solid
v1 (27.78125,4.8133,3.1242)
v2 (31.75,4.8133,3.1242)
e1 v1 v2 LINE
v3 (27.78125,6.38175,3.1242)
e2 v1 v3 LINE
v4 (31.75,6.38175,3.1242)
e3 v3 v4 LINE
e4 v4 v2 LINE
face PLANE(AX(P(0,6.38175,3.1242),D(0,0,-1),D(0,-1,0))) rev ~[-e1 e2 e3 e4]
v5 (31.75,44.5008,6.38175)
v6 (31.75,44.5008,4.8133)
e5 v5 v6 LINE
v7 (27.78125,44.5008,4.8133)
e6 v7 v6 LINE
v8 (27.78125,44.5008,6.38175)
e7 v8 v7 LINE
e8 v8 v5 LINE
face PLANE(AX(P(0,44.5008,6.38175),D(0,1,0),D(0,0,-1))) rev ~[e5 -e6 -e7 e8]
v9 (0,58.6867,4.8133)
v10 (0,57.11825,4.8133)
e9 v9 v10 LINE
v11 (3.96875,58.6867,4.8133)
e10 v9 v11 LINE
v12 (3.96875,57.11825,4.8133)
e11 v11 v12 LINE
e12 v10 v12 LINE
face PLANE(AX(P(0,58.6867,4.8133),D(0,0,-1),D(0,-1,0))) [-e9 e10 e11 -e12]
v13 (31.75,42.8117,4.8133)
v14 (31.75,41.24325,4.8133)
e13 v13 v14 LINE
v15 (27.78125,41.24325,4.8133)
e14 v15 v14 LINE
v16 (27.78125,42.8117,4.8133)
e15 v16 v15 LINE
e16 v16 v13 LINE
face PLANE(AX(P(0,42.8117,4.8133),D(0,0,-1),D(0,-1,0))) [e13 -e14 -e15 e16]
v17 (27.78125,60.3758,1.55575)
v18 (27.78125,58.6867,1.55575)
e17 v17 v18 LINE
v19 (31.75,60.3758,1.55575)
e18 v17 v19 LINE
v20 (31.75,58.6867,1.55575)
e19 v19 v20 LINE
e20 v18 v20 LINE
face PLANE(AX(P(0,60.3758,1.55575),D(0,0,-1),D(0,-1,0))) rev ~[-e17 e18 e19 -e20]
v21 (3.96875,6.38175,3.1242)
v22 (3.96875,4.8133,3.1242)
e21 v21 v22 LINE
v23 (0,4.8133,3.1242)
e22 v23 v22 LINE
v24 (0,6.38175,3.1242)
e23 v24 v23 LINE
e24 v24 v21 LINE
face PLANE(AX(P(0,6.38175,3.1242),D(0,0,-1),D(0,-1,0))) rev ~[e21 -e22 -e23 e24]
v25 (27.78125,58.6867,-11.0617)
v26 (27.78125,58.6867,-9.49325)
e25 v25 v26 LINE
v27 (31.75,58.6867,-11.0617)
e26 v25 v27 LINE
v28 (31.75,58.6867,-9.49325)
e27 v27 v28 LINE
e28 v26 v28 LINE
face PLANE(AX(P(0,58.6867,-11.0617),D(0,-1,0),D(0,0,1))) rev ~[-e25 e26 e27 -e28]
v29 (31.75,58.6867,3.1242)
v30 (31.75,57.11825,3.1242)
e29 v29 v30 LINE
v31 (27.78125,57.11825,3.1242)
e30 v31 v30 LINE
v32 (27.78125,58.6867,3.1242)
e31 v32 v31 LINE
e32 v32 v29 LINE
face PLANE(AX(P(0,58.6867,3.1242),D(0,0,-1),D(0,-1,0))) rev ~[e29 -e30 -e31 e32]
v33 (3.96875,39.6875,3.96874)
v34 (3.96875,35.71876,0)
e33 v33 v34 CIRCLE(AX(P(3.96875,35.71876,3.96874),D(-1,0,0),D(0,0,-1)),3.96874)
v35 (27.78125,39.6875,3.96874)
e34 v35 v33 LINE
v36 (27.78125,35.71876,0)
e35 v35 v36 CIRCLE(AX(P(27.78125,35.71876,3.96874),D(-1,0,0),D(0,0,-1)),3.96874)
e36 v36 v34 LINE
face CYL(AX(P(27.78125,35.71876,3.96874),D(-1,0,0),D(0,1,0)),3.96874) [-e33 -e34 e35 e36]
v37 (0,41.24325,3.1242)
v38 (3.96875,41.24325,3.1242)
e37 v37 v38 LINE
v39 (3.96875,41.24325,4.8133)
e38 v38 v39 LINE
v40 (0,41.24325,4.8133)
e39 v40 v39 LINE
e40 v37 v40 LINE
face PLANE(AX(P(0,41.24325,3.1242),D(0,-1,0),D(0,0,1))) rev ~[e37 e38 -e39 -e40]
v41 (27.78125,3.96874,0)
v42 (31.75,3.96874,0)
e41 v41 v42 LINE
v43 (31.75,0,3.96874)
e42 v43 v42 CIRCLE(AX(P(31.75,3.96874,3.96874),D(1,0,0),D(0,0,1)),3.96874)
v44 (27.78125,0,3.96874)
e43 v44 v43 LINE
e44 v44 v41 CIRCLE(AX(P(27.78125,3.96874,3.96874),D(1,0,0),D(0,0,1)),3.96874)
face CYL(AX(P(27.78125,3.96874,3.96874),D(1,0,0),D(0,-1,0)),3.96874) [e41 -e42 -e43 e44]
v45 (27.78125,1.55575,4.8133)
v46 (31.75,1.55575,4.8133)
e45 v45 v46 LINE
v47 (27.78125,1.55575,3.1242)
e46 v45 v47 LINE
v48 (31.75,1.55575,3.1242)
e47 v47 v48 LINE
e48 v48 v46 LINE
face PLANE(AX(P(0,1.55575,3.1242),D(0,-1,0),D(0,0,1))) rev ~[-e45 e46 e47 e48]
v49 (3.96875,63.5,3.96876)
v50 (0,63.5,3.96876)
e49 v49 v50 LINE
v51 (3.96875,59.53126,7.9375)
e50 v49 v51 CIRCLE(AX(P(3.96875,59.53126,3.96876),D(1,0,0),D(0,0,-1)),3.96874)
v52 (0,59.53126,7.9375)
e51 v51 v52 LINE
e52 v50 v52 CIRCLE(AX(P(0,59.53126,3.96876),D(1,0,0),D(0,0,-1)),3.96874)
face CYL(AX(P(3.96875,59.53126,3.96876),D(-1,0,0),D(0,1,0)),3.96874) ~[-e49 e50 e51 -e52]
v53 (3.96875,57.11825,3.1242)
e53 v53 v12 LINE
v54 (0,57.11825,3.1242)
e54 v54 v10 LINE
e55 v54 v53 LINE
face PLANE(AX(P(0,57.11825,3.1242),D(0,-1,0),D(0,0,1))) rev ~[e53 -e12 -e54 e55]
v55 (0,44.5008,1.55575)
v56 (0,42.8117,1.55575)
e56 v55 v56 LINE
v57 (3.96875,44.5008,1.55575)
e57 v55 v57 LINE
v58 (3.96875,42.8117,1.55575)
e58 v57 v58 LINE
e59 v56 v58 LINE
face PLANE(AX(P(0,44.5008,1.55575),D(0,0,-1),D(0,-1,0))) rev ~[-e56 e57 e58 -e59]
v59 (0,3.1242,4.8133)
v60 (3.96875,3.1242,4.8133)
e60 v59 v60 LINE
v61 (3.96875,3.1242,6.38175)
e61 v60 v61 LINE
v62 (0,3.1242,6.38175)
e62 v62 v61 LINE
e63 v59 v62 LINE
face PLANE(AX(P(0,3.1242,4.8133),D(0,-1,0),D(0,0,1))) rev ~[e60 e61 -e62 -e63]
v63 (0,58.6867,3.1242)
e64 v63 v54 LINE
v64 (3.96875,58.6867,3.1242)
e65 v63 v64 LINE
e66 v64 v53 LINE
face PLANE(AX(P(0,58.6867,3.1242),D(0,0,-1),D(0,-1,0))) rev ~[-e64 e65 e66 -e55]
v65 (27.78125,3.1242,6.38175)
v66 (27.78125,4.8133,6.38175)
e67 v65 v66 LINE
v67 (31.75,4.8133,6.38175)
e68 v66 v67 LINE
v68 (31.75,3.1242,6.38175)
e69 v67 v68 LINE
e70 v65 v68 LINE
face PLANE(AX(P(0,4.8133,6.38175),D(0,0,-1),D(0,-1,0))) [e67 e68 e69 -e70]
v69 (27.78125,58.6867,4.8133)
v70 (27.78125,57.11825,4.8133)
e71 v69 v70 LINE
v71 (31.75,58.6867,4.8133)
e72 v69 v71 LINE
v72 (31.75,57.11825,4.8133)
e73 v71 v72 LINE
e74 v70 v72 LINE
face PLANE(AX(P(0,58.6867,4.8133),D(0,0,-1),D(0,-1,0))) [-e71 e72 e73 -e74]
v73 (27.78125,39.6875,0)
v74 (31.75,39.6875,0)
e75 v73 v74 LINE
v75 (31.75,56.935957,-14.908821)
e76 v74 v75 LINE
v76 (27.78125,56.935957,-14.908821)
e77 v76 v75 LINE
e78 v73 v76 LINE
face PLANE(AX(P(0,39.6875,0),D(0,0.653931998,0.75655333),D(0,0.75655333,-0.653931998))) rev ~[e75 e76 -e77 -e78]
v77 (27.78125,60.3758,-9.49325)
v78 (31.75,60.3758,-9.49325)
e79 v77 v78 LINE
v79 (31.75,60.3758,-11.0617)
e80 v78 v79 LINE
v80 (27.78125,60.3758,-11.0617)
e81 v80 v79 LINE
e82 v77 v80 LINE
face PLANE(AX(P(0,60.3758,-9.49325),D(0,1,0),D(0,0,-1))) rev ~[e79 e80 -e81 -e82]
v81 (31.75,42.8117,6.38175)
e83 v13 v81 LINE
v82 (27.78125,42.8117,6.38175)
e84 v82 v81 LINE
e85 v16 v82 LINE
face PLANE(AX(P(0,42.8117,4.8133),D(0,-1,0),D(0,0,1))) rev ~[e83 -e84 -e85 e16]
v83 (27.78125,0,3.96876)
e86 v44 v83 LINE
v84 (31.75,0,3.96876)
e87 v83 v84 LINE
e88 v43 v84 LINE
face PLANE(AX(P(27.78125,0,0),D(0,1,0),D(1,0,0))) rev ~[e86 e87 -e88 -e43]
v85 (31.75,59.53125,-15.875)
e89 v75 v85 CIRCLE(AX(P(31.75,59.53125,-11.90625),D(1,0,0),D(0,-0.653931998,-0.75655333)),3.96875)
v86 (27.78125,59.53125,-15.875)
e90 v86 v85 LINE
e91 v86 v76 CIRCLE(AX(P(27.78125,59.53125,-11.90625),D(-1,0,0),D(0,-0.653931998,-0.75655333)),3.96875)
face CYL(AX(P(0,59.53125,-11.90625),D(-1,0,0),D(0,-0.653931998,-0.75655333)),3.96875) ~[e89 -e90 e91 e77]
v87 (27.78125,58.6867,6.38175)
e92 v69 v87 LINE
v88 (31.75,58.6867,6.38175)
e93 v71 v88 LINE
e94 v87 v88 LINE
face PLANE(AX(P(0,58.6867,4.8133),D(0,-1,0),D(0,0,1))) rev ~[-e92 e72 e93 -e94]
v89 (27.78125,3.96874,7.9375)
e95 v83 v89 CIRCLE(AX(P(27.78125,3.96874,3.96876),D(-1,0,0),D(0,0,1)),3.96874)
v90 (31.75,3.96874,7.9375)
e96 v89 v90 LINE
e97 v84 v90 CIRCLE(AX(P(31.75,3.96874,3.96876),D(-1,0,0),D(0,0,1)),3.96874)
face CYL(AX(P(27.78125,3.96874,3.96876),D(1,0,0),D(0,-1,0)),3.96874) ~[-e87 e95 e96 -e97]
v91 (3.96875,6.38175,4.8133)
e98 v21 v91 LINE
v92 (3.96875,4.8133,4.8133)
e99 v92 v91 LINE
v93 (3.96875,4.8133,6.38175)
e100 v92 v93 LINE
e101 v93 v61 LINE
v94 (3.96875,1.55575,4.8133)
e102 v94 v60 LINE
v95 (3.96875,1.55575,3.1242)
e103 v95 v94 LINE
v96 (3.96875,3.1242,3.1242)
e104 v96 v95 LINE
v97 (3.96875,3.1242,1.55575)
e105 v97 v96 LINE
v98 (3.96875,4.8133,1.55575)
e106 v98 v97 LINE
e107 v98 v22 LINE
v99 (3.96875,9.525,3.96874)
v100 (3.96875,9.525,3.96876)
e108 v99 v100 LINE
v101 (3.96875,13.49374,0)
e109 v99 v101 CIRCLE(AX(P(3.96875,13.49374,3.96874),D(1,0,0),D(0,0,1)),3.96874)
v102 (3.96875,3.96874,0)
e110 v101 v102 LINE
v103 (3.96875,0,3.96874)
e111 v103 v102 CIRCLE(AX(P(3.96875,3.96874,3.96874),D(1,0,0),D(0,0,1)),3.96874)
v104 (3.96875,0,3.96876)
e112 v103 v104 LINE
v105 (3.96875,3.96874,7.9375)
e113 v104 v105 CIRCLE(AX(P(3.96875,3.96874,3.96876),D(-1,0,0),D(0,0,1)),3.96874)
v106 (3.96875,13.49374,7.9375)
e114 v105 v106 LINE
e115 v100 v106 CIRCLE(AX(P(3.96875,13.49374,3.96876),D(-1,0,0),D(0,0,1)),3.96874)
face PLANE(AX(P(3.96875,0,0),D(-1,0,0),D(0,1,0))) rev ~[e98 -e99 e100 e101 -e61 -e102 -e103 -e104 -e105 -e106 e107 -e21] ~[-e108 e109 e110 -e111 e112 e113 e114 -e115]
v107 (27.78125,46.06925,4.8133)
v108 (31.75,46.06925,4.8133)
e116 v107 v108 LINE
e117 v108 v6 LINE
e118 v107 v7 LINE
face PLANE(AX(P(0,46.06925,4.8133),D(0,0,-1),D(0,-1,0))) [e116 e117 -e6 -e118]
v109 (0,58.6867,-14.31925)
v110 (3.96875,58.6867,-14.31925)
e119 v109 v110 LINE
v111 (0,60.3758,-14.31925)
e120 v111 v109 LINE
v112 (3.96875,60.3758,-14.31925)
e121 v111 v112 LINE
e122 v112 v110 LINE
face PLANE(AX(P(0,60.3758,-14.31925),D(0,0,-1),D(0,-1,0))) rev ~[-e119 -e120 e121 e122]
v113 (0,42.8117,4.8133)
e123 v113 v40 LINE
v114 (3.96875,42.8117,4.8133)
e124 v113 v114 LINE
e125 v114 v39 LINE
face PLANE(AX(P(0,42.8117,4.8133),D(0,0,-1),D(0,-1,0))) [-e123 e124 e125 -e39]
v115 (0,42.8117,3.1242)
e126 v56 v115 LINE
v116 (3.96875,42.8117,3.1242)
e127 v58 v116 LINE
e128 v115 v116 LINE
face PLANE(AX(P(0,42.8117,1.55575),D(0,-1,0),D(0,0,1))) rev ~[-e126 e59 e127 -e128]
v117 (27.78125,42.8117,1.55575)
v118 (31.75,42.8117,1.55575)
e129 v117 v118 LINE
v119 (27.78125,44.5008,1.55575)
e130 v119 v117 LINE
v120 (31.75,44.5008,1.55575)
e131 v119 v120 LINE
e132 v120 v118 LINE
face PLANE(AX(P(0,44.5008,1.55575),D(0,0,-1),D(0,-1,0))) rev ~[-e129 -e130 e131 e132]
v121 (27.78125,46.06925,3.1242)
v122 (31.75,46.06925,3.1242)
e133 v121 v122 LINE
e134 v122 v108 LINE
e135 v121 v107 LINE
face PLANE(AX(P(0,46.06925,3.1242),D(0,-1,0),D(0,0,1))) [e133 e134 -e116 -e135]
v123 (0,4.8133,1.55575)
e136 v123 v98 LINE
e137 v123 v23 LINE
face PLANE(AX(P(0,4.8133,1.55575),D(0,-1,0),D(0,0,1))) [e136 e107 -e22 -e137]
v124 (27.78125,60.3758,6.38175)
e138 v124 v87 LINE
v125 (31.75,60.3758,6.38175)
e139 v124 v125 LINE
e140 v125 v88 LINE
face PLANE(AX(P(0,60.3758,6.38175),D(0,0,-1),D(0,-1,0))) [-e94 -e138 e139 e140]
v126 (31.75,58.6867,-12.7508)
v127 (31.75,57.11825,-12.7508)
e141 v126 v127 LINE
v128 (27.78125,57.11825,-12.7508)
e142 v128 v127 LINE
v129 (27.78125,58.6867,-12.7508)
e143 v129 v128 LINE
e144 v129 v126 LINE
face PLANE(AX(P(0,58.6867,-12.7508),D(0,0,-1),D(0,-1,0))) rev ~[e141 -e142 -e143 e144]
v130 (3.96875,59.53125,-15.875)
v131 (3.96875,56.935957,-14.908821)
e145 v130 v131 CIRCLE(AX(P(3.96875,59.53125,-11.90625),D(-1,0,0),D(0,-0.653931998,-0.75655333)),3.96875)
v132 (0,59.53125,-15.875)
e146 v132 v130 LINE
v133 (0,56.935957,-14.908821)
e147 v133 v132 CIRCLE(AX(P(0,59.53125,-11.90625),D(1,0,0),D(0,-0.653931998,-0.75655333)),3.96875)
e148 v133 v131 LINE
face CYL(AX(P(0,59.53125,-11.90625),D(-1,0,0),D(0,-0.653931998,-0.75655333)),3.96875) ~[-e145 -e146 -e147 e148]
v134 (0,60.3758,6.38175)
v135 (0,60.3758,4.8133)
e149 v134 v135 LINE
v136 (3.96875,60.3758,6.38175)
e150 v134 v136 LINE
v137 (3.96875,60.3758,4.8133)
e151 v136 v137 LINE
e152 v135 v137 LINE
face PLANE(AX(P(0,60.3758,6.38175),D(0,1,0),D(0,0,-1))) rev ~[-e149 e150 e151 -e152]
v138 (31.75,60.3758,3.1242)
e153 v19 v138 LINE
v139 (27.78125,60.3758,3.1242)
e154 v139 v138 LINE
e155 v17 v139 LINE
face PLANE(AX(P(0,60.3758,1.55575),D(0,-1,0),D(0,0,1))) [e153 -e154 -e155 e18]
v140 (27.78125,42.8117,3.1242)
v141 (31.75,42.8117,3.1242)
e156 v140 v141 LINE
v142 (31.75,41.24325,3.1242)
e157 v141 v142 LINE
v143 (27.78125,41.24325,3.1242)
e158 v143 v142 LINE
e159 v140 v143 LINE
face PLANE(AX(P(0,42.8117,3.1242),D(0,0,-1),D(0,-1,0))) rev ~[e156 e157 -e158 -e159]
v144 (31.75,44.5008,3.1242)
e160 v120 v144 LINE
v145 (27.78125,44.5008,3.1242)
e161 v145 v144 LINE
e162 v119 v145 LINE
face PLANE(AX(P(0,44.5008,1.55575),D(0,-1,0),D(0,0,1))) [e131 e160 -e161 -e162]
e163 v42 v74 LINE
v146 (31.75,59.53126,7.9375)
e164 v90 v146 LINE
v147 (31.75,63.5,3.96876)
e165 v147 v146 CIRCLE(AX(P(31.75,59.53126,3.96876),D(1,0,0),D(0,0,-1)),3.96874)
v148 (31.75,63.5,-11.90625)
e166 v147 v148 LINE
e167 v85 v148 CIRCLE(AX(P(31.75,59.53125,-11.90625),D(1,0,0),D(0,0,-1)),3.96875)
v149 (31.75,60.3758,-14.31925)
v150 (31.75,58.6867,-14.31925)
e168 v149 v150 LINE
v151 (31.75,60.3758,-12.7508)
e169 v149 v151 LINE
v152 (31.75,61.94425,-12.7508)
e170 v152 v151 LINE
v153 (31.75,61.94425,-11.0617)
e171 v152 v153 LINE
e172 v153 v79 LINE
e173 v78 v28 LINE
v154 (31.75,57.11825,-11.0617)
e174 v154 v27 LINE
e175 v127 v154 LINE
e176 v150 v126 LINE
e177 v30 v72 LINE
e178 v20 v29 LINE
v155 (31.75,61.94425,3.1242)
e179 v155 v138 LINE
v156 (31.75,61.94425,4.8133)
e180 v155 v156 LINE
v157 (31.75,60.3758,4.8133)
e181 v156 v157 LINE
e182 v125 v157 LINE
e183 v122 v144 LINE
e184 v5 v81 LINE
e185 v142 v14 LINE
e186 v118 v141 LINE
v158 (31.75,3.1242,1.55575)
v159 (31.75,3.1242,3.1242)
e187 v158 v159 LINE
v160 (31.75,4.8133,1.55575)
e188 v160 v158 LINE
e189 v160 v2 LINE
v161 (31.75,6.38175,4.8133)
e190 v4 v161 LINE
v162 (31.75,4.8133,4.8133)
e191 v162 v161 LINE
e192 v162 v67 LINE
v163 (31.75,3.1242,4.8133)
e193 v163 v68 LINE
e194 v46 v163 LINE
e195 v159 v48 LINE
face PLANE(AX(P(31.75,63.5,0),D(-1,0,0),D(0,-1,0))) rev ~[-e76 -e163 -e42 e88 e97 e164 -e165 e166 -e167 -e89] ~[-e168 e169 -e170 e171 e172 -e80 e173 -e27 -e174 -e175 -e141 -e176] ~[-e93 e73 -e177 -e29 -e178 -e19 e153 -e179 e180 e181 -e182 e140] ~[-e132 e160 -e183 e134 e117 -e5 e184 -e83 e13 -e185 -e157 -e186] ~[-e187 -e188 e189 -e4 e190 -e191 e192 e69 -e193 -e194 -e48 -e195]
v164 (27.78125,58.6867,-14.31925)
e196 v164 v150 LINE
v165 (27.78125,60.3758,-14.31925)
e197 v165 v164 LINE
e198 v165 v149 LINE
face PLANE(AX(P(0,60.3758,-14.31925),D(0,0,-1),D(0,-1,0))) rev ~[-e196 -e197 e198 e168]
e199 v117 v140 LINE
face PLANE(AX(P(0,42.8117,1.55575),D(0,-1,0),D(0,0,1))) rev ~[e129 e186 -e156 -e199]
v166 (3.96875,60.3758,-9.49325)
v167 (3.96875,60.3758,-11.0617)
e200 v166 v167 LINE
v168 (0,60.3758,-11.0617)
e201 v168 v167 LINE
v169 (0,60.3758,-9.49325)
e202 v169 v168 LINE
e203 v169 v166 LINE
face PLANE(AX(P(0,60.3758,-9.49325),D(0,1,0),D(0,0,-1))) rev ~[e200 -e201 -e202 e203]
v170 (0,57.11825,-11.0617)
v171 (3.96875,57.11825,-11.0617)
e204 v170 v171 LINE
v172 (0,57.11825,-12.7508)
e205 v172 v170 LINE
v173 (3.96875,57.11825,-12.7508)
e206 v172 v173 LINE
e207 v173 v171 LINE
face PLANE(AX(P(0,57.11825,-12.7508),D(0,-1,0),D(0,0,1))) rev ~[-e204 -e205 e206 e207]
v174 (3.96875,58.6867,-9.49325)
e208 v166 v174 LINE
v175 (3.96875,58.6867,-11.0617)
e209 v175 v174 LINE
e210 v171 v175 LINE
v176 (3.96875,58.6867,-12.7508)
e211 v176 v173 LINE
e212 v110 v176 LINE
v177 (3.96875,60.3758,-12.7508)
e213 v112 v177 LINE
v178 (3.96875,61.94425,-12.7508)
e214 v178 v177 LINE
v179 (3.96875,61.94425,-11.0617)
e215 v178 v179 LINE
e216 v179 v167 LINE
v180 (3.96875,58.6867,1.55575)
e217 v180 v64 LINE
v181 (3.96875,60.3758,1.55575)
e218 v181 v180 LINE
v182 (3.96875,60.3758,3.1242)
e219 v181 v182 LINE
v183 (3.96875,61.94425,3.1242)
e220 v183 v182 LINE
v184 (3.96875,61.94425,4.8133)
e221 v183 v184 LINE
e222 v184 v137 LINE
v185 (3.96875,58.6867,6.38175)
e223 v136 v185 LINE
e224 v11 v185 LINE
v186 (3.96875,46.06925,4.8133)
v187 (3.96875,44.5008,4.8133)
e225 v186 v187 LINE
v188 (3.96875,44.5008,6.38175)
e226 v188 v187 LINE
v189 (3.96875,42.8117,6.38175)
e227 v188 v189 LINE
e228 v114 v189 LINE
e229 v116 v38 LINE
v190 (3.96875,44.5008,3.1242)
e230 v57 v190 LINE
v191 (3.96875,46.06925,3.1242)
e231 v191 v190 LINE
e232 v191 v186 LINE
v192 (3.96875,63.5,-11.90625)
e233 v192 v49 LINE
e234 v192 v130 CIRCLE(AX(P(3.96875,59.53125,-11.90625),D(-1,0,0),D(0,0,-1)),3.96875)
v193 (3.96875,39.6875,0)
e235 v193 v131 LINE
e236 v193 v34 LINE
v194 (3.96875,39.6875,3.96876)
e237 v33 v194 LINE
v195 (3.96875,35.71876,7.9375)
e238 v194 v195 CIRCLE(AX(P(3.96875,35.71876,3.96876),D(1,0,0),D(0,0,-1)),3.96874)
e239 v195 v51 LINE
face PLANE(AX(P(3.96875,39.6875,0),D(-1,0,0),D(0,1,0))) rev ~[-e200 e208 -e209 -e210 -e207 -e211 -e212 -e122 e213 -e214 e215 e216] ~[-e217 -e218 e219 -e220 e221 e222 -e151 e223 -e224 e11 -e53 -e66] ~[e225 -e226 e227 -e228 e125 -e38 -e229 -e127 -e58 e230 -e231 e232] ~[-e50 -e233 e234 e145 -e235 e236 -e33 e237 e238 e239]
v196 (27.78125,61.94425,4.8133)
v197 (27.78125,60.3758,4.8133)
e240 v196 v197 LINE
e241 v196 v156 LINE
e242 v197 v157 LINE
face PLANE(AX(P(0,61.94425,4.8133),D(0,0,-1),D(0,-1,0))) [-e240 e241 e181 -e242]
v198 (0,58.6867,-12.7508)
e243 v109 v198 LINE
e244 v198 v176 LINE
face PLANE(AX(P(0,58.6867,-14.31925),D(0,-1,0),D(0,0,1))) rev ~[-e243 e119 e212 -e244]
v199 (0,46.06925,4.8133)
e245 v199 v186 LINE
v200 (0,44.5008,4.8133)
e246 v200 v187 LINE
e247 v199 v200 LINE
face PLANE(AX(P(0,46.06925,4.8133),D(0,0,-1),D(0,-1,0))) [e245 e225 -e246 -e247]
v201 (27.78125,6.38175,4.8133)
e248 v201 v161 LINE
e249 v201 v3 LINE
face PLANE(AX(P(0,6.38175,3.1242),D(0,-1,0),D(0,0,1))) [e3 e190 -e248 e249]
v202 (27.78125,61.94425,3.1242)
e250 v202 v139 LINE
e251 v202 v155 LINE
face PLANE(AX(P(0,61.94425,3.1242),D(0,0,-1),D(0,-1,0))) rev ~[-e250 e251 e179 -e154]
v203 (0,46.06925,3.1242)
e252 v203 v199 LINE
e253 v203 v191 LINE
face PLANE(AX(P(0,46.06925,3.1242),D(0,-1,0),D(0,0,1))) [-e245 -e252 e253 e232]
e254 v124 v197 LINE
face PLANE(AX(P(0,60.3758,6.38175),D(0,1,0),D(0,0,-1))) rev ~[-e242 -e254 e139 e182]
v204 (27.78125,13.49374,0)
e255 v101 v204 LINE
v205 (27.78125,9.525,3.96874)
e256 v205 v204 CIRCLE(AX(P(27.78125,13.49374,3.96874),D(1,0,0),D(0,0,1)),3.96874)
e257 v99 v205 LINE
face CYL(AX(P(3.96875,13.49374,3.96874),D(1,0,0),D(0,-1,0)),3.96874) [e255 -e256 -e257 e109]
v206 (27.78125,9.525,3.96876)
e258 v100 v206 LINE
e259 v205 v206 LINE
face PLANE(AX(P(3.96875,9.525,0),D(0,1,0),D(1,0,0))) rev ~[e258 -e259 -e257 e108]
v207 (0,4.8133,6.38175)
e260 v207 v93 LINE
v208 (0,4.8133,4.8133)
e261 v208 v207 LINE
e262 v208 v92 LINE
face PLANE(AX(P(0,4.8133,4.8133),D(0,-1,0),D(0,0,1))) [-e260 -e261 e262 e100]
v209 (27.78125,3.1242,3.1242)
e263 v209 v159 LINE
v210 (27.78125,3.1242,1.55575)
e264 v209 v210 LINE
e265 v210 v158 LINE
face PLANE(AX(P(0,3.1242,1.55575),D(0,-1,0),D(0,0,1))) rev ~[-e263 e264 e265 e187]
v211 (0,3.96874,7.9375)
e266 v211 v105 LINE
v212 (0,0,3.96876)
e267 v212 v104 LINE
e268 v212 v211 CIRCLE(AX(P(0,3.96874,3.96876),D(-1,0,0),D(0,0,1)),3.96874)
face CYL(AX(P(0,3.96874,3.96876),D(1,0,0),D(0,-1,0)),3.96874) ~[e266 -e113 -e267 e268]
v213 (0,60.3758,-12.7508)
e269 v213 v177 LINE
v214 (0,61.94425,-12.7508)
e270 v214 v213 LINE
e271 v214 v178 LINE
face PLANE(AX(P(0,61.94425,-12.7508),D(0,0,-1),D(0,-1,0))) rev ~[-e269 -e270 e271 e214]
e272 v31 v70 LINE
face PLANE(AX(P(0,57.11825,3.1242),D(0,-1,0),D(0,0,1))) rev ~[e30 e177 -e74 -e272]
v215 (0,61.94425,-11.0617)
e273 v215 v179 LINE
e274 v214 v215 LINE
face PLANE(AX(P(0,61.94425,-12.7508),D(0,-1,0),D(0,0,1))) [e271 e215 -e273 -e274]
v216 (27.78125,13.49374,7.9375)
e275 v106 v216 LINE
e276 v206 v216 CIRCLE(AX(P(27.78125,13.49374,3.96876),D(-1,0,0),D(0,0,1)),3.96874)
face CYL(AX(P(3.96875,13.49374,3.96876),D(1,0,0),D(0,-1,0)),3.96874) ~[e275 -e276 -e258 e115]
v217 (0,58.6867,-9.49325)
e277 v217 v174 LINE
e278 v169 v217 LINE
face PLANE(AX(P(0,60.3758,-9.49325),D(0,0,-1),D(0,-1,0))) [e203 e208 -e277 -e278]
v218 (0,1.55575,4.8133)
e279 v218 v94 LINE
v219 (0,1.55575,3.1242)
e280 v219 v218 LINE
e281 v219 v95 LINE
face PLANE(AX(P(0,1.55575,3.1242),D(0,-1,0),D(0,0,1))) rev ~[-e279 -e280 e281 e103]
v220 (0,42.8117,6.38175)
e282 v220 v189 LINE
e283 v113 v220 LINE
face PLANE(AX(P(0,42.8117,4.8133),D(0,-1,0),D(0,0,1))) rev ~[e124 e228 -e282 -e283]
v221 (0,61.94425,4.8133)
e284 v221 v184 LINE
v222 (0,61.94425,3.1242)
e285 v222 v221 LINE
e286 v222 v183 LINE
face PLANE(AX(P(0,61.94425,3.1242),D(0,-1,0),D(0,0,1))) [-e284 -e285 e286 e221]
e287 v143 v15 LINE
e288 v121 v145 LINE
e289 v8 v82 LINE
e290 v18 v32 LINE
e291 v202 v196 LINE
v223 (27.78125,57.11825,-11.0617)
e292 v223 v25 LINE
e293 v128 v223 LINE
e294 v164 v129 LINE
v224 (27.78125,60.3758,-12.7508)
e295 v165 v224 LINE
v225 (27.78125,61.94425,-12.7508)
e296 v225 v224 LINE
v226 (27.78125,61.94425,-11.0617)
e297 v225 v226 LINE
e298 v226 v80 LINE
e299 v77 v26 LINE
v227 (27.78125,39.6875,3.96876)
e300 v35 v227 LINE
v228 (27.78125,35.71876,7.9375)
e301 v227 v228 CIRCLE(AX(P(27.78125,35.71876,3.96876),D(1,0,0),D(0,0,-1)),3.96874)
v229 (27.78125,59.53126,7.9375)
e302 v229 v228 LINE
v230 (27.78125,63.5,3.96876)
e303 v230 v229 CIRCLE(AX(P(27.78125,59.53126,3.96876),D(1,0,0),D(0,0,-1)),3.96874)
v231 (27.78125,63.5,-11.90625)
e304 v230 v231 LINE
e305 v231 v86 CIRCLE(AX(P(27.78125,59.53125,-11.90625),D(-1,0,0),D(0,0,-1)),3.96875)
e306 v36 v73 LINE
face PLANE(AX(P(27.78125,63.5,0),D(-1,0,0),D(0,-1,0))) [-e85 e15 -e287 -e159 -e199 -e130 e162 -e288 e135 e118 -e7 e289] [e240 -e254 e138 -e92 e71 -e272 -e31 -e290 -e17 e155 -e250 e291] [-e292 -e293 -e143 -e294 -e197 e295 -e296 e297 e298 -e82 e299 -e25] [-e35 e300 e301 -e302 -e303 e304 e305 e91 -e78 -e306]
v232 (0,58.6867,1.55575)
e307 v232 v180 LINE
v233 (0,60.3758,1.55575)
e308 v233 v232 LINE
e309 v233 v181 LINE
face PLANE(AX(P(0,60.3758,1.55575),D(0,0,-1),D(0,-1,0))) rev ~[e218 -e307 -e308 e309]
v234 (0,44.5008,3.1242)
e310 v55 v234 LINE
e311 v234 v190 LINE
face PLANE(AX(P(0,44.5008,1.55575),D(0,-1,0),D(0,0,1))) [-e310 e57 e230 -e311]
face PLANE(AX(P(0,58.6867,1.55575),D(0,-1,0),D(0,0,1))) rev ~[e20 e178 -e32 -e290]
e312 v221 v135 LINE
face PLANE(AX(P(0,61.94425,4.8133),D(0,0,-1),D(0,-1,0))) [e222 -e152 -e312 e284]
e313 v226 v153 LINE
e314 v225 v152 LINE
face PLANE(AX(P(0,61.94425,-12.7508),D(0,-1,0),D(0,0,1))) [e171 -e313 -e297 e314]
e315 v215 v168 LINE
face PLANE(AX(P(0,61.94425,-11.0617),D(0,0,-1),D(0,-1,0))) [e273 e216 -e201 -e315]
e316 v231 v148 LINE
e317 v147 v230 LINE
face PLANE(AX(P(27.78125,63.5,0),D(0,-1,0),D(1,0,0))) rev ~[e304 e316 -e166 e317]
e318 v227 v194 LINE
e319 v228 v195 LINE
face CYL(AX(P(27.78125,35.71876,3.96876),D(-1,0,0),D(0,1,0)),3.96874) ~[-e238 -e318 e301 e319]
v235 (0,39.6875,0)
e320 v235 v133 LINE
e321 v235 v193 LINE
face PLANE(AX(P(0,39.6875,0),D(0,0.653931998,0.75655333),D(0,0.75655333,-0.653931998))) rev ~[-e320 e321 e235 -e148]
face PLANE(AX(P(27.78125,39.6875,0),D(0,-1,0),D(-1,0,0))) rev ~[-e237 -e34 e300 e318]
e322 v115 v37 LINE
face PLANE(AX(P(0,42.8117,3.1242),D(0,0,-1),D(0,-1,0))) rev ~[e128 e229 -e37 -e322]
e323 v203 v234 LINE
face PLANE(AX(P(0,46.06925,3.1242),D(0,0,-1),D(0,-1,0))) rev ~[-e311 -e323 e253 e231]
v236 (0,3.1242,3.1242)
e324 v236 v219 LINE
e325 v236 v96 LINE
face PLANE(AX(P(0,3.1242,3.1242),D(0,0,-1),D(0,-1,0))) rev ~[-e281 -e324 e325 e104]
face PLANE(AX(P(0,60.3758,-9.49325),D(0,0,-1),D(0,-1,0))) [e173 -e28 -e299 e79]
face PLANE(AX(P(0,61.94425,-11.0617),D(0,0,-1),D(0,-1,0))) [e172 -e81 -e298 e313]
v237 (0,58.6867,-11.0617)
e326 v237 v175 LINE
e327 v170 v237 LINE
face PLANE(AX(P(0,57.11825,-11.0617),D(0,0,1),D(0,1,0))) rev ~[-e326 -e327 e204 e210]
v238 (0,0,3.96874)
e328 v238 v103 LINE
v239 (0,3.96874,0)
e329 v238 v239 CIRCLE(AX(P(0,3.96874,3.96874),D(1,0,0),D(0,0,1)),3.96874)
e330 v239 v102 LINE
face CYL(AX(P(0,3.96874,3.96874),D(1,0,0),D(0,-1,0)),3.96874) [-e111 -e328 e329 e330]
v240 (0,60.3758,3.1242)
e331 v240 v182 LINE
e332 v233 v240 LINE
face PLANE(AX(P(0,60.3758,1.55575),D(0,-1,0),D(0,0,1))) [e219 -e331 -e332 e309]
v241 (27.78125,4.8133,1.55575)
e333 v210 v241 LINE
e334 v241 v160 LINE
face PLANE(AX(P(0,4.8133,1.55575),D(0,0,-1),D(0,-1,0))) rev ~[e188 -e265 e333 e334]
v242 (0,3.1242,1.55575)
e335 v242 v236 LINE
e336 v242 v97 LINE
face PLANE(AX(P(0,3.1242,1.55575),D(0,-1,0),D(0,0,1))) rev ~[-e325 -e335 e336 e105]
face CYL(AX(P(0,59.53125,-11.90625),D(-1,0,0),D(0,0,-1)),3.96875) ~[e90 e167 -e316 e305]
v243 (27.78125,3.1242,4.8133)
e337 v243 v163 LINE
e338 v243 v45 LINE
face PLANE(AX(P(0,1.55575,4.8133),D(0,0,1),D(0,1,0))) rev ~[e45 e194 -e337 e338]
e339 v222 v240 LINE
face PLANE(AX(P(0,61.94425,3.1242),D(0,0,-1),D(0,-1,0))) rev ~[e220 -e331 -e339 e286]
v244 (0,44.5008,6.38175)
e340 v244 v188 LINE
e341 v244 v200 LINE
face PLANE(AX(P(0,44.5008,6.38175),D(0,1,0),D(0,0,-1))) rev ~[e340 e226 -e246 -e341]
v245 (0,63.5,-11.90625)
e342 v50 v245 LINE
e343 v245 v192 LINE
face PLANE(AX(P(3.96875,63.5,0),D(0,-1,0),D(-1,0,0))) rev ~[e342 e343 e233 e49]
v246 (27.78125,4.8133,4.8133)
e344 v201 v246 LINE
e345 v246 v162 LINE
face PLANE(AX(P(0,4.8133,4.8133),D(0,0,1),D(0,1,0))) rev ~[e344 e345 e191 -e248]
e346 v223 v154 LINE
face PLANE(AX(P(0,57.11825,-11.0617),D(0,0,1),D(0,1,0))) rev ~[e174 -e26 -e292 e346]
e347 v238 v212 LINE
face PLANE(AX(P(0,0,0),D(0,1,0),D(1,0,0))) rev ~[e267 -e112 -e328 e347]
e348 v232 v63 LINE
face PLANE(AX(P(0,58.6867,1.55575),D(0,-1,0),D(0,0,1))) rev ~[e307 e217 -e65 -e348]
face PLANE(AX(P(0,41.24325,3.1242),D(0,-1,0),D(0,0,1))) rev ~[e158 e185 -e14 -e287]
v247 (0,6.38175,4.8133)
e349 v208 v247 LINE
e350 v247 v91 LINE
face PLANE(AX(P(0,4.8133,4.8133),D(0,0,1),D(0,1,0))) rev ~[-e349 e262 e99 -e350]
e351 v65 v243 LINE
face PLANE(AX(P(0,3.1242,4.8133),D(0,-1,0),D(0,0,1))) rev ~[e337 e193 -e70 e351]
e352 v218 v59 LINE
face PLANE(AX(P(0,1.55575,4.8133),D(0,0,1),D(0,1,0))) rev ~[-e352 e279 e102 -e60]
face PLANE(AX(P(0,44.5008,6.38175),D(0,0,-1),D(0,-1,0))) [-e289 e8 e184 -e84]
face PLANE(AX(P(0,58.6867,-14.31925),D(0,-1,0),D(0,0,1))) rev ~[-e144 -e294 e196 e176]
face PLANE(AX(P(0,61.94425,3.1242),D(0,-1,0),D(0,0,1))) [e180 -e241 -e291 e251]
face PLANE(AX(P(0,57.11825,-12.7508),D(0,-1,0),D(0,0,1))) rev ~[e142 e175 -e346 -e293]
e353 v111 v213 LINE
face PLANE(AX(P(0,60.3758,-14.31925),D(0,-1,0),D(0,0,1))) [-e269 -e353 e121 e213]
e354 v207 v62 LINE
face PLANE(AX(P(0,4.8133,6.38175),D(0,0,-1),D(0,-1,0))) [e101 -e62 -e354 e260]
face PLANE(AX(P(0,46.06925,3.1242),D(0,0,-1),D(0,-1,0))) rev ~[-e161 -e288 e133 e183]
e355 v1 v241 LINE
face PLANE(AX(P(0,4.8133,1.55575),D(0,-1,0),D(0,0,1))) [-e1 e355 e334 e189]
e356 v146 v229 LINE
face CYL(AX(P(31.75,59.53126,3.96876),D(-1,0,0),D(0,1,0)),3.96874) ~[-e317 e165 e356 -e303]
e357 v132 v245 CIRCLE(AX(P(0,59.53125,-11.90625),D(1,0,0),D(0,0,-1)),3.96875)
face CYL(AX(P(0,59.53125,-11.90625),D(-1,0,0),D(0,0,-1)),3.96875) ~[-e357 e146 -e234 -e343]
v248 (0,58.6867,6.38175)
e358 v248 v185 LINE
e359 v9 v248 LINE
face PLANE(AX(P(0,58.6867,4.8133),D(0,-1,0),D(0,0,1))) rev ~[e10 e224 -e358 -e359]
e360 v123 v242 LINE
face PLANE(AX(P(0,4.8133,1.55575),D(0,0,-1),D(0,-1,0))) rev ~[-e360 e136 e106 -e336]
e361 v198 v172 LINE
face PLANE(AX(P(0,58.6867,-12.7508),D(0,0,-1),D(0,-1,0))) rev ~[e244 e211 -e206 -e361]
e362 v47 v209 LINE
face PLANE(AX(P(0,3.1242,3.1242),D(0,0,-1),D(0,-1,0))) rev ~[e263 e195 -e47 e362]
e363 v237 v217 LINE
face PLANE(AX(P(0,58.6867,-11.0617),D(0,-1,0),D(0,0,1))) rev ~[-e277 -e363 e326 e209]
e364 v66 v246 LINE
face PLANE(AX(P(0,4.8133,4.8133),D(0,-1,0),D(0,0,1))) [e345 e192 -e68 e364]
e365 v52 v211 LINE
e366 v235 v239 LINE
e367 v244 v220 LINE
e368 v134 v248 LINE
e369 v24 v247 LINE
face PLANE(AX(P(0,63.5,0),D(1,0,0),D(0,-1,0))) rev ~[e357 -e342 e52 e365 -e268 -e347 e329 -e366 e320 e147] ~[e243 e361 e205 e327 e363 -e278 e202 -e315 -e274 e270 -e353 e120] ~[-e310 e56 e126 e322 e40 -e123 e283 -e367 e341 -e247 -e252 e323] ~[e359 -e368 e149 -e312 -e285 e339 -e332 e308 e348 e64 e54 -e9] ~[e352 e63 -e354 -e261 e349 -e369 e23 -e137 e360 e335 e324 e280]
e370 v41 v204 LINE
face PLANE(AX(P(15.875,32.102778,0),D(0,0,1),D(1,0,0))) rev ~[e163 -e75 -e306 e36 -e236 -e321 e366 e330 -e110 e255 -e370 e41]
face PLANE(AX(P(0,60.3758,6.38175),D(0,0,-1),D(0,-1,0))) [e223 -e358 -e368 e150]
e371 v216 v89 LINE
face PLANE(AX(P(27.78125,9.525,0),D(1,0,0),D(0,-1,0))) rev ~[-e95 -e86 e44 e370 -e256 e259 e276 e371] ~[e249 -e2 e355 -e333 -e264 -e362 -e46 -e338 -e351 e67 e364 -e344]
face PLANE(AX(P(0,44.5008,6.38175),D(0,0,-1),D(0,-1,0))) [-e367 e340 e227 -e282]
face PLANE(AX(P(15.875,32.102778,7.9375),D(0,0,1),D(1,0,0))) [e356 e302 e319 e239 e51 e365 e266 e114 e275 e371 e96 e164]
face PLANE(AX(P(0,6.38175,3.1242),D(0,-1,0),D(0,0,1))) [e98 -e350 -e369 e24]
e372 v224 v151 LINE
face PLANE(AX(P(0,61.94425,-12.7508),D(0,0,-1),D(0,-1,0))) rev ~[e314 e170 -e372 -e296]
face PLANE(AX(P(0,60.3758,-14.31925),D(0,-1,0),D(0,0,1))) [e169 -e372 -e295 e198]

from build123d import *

# Parameters (mm, degrees)
F1_DEPTH = 7.9375
F2_R     = 3.96874
F3_W     = 3.96875
F3_H     = 23.8125
F4_DEPTH = 15.875
F5_W     = 1.56845
F5_H     = 1.6891
F5_W_2   = 1.6891
F5_H_2   = 1.56845
F6_DEPTH = 31.75


# Not quite as in the source:
# - a fillet or chamfer is up to 0.001 mm smaller than in the source, because OpenCascade refuses the exact size


with BuildPart() as f1:
    # F0 (on Top) → F1 (new body)
    with BuildSketch(Plane.XY):
        Polygon((0, 63.5), (0, 0), (3.96875, 0), (3.96875, 9.525), (27.78125, 9.525), (27.78125, 0), (31.75, 0), (31.75, 63.5), (27.78125, 63.5), (27.78125, 39.6875), (3.96875, 39.6875), (3.96875, 63.5), align=None)
    extrude(amount=F1_DEPTH)

    # F2 (radius 3.96875 in the source; OpenCascade refuses exactly that, so slightly less here)
    f2_edges = [f1.edges().sort_by_distance(p)[0] for p in [
        (15.875, 39.6875, 7.9375),
        (15.875, 39.6875, 0),
        (1.984375, 63.5, 7.9375),
        (29.765625, 63.5, 7.9375),
        (1.984375, 0, 7.9375),
        (1.984375, 0, 0),
        (29.765625, 0, 7.9375),
        (29.765625, 0, 0),
        (15.875, 9.525, 7.9375),
        (15.875, 9.525, 0),
    ]]
    fillet(f2_edges, radius=F2_R)

    # F3 (on face) → F4 (join)
    with BuildSketch(Plane(origin=(0, 0, 0), x_dir=(1, 0, 0), z_dir=(0, 0, -1))):
        with Locations((29.765625, -51.59375)):
            Rectangle(F3_W, F3_H)
        with Locations((1.984375, -51.59375)):
            Rectangle(F3_W, F3_H)
    extrude(amount=F4_DEPTH)

    # F5 (on face) → F6 (cut, through all)
    with BuildSketch(Plane(origin=(0, 0, 0), x_dir=(0, -1, 0), z_dir=(-1, 0, 0))):
        with Locations((-5.597525, 3.96875)):
            Rectangle(F5_W, F5_H)
        with Locations((-3.96875, 3.96875)):
            Rectangle(F5_W_2, F5_H)
        with Locations((-3.96875, 2.339975)):
            Rectangle(F5_W_2, F5_H_2)
        with Locations((-2.339975, 3.96875)):
            Rectangle(F5_W, F5_H)
        with Locations((-3.96875, 5.597525)):
            Rectangle(F5_W_2, F5_H_2)
        with BuildLine():
            Line((-63.5, -15.875), (-59.53125, -15.875))
            ThreePointArc((-59.53125, -15.875), (-62.3375800378, -14.7125800378), (-63.5, -11.90625))
            Line((-63.5, -11.90625), (-63.5, -15.875))
        make_face()
        with BuildLine():
            Line((-59.53125, -15.875), (-39.6875, -15.875))
            Line((-39.6875, -15.875), (-39.6875, 0))
            Line((-39.6875, 0), (-56.935957382, -14.9088210299))
            ThreePointArc((-56.935957382, -14.9088210299), (-58.146597916, -15.6256202651), (-59.53125, -15.875))
        make_face()
        with Locations((-57.902475, -11.90625)):
            Rectangle(F5_W, F5_H)
        with Locations((-59.53125, -11.90625)):
            Rectangle(F5_W_2, F5_H)
        with Locations((-59.53125, -10.277475)):
            Rectangle(F5_W_2, F5_H_2)
        with Locations((-61.160025, -11.90625)):
            Rectangle(F5_W, F5_H)
        with Locations((-59.53125, -13.535025)):
            Rectangle(F5_W_2, F5_H_2)
        with Locations((-59.53125, 5.597525)):
            Rectangle(F5_W_2, F5_H_2)
        with Locations((-59.53125, 3.96875)):
            Rectangle(F5_W_2, F5_H)
        with Locations((-61.160025, 3.96875)):
            Rectangle(F5_W, F5_H)
        with Locations((-57.902475, 3.96875)):
            Rectangle(F5_W, F5_H)
        with Locations((-59.53125, 2.339975)):
            Rectangle(F5_W_2, F5_H_2)
        with Locations((-43.65625, 5.597525)):
            Rectangle(F5_W_2, F5_H_2)
        with Locations((-43.65625, 3.96875)):
            Rectangle(F5_W_2, F5_H)
        with Locations((-45.285025, 3.96875)):
            Rectangle(F5_W, F5_H)
        with Locations((-42.027475, 3.96875)):
            Rectangle(F5_W, F5_H)
        with Locations((-43.65625, 2.339975)):
            Rectangle(F5_W_2, F5_H_2)
    extrude(amount=-F6_DEPTH, mode=Mode.SUBTRACT)


solid = f1.part
